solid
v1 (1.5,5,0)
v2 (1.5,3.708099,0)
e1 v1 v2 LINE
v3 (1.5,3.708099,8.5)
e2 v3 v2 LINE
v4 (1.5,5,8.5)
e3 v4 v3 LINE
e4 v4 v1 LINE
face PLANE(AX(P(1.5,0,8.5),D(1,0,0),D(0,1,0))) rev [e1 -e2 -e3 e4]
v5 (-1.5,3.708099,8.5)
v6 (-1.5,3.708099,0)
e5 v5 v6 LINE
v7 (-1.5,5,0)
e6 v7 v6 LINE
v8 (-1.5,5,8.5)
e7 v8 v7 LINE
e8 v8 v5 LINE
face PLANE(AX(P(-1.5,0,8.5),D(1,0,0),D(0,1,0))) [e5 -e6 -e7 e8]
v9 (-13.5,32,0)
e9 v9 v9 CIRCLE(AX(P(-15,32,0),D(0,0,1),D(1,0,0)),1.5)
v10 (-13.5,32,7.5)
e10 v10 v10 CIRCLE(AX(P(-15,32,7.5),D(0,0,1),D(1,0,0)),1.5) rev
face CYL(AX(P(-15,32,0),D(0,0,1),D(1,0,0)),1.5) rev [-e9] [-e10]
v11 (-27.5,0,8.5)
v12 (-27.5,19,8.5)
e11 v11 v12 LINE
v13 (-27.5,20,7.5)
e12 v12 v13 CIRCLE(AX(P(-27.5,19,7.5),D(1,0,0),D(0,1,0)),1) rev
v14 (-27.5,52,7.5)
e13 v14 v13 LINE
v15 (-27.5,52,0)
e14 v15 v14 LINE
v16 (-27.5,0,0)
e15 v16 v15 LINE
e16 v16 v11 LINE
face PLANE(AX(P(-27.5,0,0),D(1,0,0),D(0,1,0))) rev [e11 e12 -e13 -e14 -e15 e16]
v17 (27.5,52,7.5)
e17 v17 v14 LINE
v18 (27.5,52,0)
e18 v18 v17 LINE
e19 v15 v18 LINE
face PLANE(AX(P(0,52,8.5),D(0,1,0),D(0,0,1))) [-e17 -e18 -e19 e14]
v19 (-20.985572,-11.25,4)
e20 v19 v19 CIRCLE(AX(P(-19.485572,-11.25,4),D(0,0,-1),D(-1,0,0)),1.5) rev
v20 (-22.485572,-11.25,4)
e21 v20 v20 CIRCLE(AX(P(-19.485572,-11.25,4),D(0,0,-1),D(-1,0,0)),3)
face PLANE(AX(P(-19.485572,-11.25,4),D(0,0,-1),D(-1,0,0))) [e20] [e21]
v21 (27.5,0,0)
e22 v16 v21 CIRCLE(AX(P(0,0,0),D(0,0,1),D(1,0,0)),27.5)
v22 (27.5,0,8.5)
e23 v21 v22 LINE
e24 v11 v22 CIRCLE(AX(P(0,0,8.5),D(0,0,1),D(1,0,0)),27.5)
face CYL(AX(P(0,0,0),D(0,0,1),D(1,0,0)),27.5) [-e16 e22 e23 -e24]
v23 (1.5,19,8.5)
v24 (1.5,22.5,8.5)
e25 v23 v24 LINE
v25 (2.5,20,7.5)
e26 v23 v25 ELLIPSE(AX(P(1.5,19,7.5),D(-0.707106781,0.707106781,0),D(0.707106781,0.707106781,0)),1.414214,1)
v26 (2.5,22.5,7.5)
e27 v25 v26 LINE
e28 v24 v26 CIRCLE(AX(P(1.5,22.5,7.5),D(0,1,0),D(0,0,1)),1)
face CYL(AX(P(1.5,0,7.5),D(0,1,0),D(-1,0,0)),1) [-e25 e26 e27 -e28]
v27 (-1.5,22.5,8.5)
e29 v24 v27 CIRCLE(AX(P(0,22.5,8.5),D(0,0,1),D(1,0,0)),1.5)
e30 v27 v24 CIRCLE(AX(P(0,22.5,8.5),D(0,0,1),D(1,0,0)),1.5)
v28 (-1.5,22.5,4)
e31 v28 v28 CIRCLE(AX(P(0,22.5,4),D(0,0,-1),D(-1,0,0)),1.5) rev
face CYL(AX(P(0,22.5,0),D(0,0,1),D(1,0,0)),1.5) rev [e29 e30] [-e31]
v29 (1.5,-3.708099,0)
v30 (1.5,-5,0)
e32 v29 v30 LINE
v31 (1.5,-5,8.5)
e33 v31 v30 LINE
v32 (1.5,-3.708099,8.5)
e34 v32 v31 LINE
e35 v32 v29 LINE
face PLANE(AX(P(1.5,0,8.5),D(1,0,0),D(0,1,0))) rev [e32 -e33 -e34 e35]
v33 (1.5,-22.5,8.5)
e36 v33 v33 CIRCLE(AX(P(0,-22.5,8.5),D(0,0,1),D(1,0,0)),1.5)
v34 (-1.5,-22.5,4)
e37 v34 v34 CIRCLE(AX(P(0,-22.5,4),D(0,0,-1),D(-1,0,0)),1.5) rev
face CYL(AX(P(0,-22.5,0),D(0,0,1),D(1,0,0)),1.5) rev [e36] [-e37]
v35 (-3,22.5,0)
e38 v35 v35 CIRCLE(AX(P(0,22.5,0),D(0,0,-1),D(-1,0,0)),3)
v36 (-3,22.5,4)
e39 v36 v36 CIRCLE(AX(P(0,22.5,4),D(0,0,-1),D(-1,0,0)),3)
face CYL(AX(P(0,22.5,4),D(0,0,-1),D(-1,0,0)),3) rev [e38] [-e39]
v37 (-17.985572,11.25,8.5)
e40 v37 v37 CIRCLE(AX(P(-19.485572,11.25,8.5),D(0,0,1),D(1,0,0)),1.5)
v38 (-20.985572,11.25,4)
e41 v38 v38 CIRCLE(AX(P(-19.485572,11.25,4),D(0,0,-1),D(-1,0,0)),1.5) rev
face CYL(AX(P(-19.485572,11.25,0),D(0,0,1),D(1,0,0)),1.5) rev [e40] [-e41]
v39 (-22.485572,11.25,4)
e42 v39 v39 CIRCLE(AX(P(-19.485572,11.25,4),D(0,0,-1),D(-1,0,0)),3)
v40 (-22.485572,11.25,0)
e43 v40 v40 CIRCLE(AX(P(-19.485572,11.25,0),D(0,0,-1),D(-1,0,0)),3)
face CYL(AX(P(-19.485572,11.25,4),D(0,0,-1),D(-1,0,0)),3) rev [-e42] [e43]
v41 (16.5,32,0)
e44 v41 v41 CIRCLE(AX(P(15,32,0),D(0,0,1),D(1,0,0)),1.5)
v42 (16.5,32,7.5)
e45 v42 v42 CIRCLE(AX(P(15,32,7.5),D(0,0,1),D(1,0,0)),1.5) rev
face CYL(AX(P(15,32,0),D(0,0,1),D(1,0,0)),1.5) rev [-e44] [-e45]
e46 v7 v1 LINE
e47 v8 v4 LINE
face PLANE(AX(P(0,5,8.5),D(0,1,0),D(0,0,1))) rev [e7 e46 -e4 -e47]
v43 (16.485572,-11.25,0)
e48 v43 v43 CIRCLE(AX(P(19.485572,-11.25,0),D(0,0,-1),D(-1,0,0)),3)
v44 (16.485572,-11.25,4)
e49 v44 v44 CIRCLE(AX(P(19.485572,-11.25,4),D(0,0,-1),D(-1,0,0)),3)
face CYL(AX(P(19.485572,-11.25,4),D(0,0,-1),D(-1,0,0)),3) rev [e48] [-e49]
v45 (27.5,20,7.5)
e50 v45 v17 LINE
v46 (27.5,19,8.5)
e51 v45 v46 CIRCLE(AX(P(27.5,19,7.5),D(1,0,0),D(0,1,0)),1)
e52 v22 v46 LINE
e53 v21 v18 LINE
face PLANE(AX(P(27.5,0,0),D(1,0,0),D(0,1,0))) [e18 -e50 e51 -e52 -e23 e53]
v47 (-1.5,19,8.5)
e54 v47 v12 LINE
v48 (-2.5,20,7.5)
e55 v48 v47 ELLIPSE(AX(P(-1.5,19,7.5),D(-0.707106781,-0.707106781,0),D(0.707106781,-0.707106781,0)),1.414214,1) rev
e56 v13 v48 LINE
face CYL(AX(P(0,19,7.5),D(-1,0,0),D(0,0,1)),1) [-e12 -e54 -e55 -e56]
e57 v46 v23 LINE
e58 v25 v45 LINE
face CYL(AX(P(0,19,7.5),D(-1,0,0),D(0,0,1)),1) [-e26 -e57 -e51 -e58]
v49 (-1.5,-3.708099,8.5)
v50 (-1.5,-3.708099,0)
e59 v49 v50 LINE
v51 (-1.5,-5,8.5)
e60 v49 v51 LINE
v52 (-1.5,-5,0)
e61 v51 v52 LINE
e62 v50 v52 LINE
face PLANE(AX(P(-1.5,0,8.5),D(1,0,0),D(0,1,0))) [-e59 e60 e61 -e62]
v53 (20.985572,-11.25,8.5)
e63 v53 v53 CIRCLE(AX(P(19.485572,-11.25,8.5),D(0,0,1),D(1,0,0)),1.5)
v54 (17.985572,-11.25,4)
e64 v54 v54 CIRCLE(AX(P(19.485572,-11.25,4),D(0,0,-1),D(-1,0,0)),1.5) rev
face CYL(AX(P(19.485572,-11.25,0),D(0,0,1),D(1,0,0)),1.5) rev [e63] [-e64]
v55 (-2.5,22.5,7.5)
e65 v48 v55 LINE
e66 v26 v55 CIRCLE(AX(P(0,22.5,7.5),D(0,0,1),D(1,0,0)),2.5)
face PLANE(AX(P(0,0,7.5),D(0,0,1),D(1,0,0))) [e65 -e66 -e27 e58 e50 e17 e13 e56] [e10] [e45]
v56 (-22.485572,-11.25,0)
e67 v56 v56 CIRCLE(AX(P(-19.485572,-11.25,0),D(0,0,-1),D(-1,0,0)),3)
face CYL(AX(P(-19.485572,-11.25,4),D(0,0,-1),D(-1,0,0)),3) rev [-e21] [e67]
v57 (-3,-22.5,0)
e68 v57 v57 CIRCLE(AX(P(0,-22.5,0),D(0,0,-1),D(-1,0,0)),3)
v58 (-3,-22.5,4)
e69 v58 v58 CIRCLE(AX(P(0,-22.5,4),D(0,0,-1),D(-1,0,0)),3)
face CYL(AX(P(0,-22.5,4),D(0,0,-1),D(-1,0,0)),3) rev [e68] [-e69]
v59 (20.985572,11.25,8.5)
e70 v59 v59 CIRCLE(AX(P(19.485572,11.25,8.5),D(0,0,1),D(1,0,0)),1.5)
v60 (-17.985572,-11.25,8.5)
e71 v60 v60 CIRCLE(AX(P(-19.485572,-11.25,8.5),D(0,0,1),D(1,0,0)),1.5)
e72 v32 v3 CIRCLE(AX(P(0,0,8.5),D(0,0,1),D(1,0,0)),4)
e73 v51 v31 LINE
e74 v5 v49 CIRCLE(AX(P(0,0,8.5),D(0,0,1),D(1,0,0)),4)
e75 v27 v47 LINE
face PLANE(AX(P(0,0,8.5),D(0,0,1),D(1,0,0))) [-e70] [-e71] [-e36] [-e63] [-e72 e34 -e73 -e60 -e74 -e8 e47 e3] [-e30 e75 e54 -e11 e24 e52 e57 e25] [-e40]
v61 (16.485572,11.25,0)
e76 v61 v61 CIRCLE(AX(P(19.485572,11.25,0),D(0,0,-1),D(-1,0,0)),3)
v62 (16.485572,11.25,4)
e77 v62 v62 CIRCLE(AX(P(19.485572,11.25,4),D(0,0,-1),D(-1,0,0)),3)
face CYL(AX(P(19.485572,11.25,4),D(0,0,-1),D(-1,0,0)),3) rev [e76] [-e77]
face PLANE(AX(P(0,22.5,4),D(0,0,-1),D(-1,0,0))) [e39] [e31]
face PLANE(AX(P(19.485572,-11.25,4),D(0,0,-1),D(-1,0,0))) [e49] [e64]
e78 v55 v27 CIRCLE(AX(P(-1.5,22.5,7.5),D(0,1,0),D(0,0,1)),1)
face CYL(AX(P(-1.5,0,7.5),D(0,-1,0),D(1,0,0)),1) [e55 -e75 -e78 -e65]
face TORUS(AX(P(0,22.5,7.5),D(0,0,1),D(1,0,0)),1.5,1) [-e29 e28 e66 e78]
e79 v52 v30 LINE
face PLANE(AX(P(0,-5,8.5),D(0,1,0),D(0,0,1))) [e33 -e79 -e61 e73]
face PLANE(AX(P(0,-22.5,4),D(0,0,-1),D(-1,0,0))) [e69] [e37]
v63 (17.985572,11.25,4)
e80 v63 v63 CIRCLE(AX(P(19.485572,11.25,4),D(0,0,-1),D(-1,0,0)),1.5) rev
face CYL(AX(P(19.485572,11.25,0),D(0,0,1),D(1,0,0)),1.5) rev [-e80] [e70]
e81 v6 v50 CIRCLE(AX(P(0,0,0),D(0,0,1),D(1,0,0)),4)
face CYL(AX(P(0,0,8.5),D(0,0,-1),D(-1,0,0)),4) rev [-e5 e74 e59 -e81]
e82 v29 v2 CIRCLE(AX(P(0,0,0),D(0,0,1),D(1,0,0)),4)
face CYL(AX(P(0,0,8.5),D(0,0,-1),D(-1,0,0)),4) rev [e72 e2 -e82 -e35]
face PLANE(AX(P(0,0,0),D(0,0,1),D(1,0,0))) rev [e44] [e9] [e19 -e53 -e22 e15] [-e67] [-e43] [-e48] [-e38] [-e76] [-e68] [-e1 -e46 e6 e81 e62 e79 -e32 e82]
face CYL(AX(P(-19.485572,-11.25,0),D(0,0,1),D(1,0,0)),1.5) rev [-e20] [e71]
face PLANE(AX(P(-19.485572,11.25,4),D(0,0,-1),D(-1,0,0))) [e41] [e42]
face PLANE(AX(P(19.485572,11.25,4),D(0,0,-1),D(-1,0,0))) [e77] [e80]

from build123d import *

# Parameters (mm, degrees)
ESQUISSE1_W             = 100
ESQUISSE1_H             = 100.548113933
BOSS_EXTRU_1_DEPTH      = 8.5
ESQUISSE2_R             = 1.5
ENL_V_MAT_EXTRU_1_DEPTH = 73.637800077
ENL_V_MAT_EXTRU_6_DEPTH = 1
CONG_4_R                = 1
ESQUISSE4_R             = 3
ENL_V_MAT_EXTRU_7_DEPTH = 4


with BuildPart() as part:
    # Esquisse1 → Boss.-Extru.1 (new body)
    with BuildSketch(Plane.XY):
        with Locations((0, 1.725943033)):
            Rectangle(ESQUISSE1_W, ESQUISSE1_H)
        with BuildLine():
            Line((-1.5, 3.708099244), (-1.5, 5))
            Line((-1.5, 5), (1.5, 5))
            Line((1.5, 5), (1.5, 3.708099244))
            ThreePointArc((1.5, 3.708099244), (3.31662479, 2.236067977), (4, 0))
            ThreePointArc((4, 0), (3.31662479, -2.236067977), (1.5, -3.708099244))
            Line((1.5, -3.708099244), (1.5, -5))
            Line((1.5, -5), (-1.5, -5))
            Line((-1.5, -5), (-1.5, -3.708099244))
            ThreePointArc((-1.5, -3.708099244), (-4, 0), (-1.5, 3.708099244))
        make_face(mode=Mode.SUBTRACT)
    extrude(amount=BOSS_EXTRU_1_DEPTH)

    # Esquisse2 → Enlèv. mat.-Extru.1 (cut, through all)
    with BuildSketch(Plane.XY.offset(8.5)):
        with BuildLine():
            ThreePointArc((27.5, 0), (0, -27.5), (-27.5, 0))
            Line((-27.5, 0), (-27.5, 52))
            Line((-27.5, 52), (-50, 52))
            Line((-50, 52), (-50, -48.548113933))
            Line((-50, -48.548113933), (50, -48.548113933))
            Line((50, -48.548113933), (50, 52))
            Line((50, 52), (27.5, 52))
            Line((27.5, 52), (27.5, 0))
        make_face()
        with Locations((0, 22.5)):
            Circle(ESQUISSE2_R)
        with Locations((19.485571585, 11.25)):
            Circle(ESQUISSE2_R)
        with Locations((19.485571585, -11.25)):
            Circle(ESQUISSE2_R)
        with Locations((0, -22.5)):
            Circle(ESQUISSE2_R)
        with Locations((-19.485571585, -11.25)):
            Circle(ESQUISSE2_R)
        with Locations((-19.485571585, 11.25)):
            Circle(ESQUISSE2_R)
        with Locations((-15, 32)):
            Circle(ESQUISSE2_R)
        with Locations((15, 32)):
            Circle(ESQUISSE2_R)
    extrude(amount=-ENL_V_MAT_EXTRU_1_DEPTH, mode=Mode.SUBTRACT)

    # Esquisse3 → Enlèv. mat.-Extru.6 (cut)
    with BuildSketch(Plane.XY.offset(8.5)):
        with BuildLine():
            Line((27.5, 52), (-27.5, 52))
            Line((-27.5, 52), (-27.5, 20))
            Line((-27.5, 20), (-2.5, 20))
            Line((-2.5, 20), (-2.5, 22.5))
            ThreePointArc((-2.5, 22.5), (0, 25), (2.5, 22.5))
            Line((2.5, 22.5), (2.5, 20))
            Line((2.5, 20), (27.5, 20))
            Line((27.5, 20), (27.5, 52))
        make_face()
    extrude(amount=-ENL_V_MAT_EXTRU_6_DEPTH, mode=Mode.SUBTRACT)

    # Congé4
    cong_4_edges = [part.edges().sort_by_distance(p)[0] for p in [
        (-15, 20, 8.5),
        (15, 20, 8.5),
        (2.5, 21.25, 8.5),
        (-2.5, 21.25, 8.5),
        (0, 25, 8.5),
    ]]
    fillet(cong_4_edges, radius=CONG_4_R - 0.0001)  # a hair under: the kernel refuses the full size

    # Esquisse4 → Enlèv. mat.-Extru.7 (cut)
    with BuildSketch(Plane(origin=(0, 0, 0), x_dir=(-1, 0, 0), z_dir=(0, 0, -1))):
        with Locations((0, 22.5)):
            Circle(ESQUISSE4_R)
        with Locations((19.485571585, 11.25)):
            Circle(ESQUISSE4_R)
        with Locations((19.485571585, -11.25)):
            Circle(ESQUISSE4_R)
        with Locations((0, -22.5)):
            Circle(ESQUISSE4_R)
        with Locations((-19.485571585, -11.25)):
            Circle(ESQUISSE4_R)
        with Locations((-19.485571585, 11.25)):
            Circle(ESQUISSE4_R)
    extrude(amount=-ENL_V_MAT_EXTRU_7_DEPTH, mode=Mode.SUBTRACT)


solid = part.part
